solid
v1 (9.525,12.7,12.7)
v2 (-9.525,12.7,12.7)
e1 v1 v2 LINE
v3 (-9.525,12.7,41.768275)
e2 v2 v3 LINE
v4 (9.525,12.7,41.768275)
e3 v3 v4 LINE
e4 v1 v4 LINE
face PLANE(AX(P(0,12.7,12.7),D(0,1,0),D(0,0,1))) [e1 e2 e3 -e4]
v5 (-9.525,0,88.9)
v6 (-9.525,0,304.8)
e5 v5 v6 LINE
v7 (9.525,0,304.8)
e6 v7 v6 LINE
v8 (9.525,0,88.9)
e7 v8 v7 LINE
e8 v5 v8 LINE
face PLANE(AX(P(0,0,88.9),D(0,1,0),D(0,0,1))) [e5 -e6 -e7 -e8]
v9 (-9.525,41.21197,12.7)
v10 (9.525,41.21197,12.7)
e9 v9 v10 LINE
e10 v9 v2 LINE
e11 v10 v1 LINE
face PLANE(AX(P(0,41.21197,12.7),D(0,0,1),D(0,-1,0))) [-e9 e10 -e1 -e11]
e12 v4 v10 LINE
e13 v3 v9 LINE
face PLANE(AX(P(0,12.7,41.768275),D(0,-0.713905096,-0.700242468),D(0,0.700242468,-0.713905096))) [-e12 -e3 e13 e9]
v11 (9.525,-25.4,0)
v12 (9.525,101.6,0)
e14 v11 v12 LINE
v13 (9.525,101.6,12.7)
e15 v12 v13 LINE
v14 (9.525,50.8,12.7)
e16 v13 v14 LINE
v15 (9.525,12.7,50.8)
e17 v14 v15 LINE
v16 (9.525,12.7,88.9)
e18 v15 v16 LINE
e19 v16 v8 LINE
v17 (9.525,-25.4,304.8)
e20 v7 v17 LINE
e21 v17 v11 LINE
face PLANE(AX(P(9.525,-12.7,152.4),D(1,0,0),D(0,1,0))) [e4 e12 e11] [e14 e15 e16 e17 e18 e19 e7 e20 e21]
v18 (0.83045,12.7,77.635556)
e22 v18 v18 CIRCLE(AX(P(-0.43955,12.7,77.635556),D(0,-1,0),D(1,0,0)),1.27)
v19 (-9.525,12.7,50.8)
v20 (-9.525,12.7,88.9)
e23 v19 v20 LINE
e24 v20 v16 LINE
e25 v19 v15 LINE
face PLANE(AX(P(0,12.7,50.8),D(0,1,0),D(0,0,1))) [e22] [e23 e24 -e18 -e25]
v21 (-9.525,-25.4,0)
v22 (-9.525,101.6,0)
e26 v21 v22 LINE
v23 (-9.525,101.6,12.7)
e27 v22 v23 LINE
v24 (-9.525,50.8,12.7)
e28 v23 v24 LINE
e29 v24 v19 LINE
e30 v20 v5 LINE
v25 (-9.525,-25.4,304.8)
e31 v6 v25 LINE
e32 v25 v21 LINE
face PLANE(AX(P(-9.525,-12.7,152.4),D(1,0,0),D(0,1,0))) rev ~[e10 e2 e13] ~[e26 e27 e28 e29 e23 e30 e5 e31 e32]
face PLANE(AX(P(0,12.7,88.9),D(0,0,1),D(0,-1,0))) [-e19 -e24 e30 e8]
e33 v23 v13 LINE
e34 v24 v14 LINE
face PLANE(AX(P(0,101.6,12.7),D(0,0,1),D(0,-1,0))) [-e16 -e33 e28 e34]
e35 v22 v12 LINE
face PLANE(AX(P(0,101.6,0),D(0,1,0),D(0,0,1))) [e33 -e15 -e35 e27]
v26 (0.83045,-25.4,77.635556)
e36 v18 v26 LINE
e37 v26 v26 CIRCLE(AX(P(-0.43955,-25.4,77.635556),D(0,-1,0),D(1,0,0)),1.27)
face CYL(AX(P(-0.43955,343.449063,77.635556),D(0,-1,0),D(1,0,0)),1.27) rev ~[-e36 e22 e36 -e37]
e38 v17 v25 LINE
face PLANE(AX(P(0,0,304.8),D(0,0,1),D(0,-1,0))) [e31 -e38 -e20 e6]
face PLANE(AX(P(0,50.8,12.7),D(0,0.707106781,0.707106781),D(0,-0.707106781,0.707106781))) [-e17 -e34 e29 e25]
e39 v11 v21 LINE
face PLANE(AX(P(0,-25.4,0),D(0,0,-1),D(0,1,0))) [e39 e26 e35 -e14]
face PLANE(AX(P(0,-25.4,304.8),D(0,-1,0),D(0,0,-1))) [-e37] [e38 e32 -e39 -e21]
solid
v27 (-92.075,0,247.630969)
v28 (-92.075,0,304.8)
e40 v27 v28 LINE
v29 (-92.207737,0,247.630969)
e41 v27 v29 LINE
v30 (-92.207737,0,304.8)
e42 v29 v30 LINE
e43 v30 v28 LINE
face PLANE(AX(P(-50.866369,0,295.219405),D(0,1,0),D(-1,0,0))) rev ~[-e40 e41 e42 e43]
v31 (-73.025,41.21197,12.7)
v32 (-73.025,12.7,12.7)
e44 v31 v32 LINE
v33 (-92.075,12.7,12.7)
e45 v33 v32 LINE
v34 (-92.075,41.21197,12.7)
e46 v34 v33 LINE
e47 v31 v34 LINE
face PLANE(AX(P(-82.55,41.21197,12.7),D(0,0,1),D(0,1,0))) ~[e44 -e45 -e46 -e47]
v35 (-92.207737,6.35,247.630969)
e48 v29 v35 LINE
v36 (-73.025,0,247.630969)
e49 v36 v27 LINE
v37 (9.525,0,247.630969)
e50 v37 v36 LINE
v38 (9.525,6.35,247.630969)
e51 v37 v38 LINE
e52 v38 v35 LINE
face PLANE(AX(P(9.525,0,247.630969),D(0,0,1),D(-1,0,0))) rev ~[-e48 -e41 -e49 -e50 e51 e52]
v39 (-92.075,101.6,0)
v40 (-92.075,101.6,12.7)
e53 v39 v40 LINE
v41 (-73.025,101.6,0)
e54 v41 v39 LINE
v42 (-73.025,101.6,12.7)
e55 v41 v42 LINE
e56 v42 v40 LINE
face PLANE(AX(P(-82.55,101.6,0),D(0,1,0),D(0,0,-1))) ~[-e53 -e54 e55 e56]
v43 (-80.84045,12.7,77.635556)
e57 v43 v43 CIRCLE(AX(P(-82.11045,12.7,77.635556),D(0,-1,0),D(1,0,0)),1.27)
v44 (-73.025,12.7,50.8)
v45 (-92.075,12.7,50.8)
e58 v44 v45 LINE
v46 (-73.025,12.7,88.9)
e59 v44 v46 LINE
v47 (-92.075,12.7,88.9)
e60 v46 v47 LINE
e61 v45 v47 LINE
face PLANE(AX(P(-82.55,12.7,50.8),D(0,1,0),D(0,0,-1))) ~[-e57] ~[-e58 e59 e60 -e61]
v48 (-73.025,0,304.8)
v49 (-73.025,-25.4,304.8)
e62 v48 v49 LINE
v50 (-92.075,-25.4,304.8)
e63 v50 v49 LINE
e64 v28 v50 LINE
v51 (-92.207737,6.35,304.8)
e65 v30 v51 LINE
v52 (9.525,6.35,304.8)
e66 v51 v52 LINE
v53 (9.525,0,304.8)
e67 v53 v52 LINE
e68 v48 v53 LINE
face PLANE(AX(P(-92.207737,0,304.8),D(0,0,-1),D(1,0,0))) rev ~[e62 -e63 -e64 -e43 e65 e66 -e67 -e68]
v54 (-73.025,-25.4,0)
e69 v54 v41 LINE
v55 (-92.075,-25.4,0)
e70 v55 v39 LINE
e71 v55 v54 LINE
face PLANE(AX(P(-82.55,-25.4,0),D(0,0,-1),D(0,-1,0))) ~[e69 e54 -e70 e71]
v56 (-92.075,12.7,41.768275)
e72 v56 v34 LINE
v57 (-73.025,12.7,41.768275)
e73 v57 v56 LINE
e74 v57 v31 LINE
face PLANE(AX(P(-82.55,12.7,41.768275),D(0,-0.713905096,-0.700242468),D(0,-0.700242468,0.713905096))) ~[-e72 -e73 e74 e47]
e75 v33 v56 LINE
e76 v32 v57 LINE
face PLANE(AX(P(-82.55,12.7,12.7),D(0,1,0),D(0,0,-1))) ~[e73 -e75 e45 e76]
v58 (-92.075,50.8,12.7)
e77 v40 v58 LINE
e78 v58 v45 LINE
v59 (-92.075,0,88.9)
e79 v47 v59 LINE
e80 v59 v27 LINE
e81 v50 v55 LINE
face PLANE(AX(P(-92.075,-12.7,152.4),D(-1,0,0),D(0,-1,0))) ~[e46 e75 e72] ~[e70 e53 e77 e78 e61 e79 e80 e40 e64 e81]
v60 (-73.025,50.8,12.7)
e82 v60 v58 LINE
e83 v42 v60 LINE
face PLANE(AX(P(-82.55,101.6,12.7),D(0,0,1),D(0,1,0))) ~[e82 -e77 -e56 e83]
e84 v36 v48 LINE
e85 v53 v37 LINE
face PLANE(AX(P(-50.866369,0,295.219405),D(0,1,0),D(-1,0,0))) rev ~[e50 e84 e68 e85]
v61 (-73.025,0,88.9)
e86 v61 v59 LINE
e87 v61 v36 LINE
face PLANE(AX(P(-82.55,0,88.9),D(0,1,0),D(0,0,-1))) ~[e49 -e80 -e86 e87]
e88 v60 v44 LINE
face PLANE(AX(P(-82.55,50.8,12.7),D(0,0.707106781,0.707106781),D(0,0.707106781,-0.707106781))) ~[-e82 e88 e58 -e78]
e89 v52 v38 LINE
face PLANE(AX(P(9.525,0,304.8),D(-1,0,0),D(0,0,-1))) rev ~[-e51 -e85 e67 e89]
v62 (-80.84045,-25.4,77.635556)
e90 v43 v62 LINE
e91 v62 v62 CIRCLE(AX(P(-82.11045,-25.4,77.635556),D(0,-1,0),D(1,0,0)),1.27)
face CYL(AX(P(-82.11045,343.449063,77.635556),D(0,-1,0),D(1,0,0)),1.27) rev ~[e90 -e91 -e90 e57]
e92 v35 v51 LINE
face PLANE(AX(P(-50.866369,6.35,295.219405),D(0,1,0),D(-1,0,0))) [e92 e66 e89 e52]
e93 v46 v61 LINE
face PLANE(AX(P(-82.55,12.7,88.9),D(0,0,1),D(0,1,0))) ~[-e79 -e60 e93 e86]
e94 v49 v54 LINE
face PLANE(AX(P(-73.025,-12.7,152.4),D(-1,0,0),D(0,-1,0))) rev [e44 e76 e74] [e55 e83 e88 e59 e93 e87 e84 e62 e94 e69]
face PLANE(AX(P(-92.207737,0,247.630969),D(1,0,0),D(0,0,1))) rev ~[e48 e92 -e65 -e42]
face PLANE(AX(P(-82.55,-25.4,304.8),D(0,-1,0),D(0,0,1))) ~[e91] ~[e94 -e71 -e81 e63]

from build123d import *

# Parameters (mm, degrees)
F1_DEPTH = 9.525
F5_D     = 2.54
F5_2_D   = 2.54
F6_W     = 82.682737267
F6_H     = 19.1611907959
F6_H_2   = 18.3808207512
F6_H_3   = 19.627019763
F6_W_2   = 19.05
F7_DEPTH = 6.35


with BuildPart() as f1:
    # F0 (on Right) → F1 (new body, symmetric)
    with BuildSketch(Plane.YZ):
        Polygon((-25.4, 0), (0, 0), (0, 12.7), (0, 88.9), (0, 304.8), (-25.4, 304.8), align=None)
        Polygon((0, 88.9), (0, 12.7), (12.7, 12.7), (12.7, 41.7682752013), (12.7, 50.8), (12.7, 88.9), align=None)
        Polygon((41.2119701505, 12.7), (50.8, 12.7), (12.7, 50.8), (12.7, 41.7682752013), align=None)
        Polygon((0, 12.7), (0, 0), (101.6, 0), (101.6, 12.7), (50.8, 12.7), (41.2119701505, 12.7), (12.7, 12.7), align=None)
    extrude(amount=F1_DEPTH, both=True)


with BuildPart() as f3_1:
    # F3: instance of F1
    add(f1.part.mirror(Plane(origin=(-41.275, -1.6869500415, 120.8741886465), x_dir=(0, 1, 0), z_dir=(-1, 0, 0))))

    # F5#2 (through all)
    with Locations(Plane(origin=(0, 12.7, 0), x_dir=(-1, 0, 0), z_dir=(0, 1, 0))):
        with Locations((0.4395503283, 77.6355564594), (82.1104496717, 77.6355564594)):
            Hole(F5_2_D / 2)

    # F6 (on face) → F7 (join)
    with BuildSketch(Plane(origin=(0, 0, 0), x_dir=(-1, 0, 0), z_dir=(0, 1, 0))):
        with Locations((50.8663686335, 295.2194046021)):
            Rectangle(F6_W, F6_H)
        with Locations((50.8663686335, 276.4483988285)):
            Rectangle(F6_W, F6_H_2)
        with Locations((50.8663686335, 257.4444785714)):
            Rectangle(F6_W, F6_H_3)
        with Locations((0, 295.2194046021)):
            Rectangle(F6_W_2, F6_H)
        with Locations((0, 276.4483988285)):
            Rectangle(F6_W_2, F6_H_2)
        with Locations((0, 257.4444785714)):
            Rectangle(F6_W_2, F6_H_3)
    extrude(amount=F7_DEPTH)


with BuildPart() as f1_1:
    add(f1.part)

    # F5 (through all)
    with Locations(Plane(origin=(0, 12.7, 0), x_dir=(-1, 0, 0), z_dir=(0, 1, 0))):
        with Locations((0.4395503283, 77.6355564594), (82.1104496717, 77.6355564594)):
            Hole(F5_D / 2)


solid = Compound([f3_1.part, f1_1.part])
